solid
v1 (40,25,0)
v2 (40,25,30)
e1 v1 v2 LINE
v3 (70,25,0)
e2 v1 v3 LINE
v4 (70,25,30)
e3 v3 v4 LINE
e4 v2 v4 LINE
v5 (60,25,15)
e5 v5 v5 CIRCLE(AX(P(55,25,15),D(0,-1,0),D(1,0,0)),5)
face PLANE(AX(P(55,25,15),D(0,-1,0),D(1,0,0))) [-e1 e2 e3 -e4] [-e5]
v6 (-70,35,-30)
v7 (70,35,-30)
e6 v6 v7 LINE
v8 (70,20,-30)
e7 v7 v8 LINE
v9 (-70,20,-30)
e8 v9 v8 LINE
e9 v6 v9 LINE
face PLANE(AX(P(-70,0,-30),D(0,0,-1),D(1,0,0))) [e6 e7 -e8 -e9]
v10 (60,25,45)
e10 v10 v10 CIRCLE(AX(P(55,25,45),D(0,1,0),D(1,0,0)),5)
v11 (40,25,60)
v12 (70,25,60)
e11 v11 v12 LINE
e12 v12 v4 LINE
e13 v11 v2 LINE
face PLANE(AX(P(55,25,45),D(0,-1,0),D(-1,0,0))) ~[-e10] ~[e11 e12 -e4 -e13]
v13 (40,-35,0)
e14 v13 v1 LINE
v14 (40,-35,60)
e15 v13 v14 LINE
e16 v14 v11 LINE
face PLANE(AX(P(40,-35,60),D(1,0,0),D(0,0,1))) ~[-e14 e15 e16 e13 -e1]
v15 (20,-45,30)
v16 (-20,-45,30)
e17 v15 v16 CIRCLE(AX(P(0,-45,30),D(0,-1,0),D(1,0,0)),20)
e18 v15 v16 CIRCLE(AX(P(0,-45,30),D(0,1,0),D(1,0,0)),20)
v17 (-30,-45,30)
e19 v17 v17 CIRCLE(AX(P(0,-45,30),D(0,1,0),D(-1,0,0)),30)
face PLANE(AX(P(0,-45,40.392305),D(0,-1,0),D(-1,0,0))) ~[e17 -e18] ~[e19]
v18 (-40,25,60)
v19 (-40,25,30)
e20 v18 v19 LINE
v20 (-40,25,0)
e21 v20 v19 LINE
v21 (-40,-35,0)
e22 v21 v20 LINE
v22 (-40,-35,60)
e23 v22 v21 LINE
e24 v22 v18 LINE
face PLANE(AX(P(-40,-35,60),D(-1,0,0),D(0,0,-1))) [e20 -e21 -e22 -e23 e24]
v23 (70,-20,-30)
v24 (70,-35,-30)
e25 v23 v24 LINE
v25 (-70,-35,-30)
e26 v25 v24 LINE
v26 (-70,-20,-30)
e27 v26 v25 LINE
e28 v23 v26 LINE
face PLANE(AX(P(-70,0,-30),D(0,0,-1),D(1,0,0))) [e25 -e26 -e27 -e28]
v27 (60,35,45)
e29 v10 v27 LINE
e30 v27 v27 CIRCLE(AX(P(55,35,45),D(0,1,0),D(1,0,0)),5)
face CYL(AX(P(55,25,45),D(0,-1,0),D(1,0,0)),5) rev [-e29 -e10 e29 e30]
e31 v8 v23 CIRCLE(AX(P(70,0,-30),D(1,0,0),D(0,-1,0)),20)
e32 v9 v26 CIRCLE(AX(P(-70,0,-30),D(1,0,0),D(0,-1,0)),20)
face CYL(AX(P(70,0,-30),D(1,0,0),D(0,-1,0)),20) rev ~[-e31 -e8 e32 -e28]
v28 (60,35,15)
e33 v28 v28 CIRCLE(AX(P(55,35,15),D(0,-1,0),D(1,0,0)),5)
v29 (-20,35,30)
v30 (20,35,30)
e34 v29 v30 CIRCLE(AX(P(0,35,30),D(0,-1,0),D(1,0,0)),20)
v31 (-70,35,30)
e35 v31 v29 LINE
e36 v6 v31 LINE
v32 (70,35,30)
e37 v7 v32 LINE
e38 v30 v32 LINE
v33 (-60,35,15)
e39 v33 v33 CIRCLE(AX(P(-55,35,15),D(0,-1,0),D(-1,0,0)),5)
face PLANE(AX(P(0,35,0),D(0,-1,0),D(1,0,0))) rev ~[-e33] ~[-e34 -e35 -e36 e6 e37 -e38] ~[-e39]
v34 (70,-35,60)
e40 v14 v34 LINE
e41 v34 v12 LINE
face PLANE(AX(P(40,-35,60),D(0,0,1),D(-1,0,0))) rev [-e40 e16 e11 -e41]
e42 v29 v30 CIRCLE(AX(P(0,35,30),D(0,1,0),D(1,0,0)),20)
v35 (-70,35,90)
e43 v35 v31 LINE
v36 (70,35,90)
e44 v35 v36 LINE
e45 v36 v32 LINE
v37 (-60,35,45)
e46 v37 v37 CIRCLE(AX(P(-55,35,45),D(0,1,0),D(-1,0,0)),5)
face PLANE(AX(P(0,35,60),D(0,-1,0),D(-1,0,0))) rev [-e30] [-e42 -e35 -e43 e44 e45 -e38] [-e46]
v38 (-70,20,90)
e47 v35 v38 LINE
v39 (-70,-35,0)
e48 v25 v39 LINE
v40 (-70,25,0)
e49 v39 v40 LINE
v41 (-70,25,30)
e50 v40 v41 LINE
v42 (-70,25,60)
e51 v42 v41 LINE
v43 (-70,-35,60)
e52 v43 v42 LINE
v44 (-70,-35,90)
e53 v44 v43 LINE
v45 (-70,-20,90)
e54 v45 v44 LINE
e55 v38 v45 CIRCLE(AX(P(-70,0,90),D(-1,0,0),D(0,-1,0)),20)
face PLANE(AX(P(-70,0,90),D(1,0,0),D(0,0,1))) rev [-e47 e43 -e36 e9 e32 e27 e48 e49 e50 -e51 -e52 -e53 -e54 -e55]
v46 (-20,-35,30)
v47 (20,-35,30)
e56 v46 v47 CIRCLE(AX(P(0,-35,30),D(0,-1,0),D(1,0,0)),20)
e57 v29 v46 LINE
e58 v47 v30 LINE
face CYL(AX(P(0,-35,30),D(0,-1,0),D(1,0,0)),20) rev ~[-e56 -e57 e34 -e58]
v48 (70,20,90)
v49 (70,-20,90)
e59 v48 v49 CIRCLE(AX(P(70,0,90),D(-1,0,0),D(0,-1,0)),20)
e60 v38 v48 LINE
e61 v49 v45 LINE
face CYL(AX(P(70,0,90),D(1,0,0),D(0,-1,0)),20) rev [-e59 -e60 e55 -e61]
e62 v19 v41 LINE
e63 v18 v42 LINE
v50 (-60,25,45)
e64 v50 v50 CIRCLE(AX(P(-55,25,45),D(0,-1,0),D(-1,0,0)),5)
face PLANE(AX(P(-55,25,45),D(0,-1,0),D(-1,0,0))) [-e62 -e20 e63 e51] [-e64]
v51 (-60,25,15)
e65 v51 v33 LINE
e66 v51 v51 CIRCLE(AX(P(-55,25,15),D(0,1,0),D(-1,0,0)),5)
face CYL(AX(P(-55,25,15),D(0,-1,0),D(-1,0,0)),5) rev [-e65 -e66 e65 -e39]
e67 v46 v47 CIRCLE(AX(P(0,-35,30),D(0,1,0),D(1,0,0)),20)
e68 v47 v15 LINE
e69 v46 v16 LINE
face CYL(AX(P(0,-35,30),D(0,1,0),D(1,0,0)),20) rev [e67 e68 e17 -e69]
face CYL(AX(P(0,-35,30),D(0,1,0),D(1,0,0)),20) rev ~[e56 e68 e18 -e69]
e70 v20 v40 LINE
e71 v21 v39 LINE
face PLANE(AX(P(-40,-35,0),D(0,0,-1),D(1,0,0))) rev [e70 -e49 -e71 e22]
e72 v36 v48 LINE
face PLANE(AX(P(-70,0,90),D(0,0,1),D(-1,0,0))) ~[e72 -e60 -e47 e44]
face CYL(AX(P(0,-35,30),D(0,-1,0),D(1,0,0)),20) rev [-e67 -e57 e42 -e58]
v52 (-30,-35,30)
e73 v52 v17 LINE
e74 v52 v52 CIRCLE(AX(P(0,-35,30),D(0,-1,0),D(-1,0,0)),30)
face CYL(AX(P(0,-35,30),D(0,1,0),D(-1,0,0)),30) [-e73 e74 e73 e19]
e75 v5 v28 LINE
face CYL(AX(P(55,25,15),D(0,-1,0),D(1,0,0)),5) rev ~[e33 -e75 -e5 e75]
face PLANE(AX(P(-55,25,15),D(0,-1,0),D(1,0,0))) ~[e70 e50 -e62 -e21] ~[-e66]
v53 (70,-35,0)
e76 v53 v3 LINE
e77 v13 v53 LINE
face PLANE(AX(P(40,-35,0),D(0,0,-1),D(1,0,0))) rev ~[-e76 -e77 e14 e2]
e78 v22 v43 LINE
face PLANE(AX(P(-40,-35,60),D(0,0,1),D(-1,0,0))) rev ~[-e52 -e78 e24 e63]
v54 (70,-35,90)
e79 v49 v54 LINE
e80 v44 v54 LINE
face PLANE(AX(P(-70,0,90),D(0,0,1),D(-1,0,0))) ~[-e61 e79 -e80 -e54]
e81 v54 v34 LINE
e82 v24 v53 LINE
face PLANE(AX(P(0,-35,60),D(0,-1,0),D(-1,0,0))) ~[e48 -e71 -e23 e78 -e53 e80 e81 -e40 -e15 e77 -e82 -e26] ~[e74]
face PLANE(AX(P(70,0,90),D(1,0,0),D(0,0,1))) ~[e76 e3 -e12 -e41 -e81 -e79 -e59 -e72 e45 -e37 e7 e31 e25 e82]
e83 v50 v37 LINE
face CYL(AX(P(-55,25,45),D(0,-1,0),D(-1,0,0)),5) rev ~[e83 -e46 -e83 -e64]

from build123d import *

# Parameters (mm, degrees)
F0_W      = 140
F0_H      = 60
F1_DEPTH  = 35
F3_DEPTH  = 140.001
F4_W      = 30
F4_H      = 30
F5_DEPTH  = 60
F6_R      = 20
F7_DEPTH  = 72.1
F9_DEPTH  = 10
F11_DEPTH = 25
F12_R     = 5
F13_DEPTH = 25


# Not quite as in the source:
# - a pattern or mirror of a feature is missing from the dataset's text; its kind, count and spacing are read off the source's solid


with BuildPart() as f1:
    # F0 (on Front) → F1 (new body, symmetric)
    with BuildSketch(Plane.XZ):
        Rectangle(F0_W, F0_H)
    extrude(amount=F1_DEPTH, both=True)

    # F2 (on face) → F3 (cut, through all)
    with BuildSketch(Plane.YZ.offset(70)):
        with BuildLine():
            Line((-20, -30), (20, -30))
            ThreePointArc((20, -30), (0, -10), (-20, -30))
        make_face()
        with BuildLine():
            ThreePointArc((-20, -30), (0, -50), (20, -30))
            Line((20, -30), (-20, -30))
        make_face()
    extrude(amount=-F3_DEPTH, mode=Mode.SUBTRACT)

    # F4 (on face) → F5 (cut)
    with BuildSketch(Plane.XZ.offset(35)):
        with Locations((55, 15)):
            Rectangle(F4_W, F4_H)
    f5 = extrude(amount=-F5_DEPTH, mode=Mode.SUBTRACT)

    # F5_copies: F5 across plane
    add(f5.mirror(Plane(origin=(0, 0, 0), x_dir=(0, 0, -1), z_dir=(-1, 0, 0))), mode=Mode.SUBTRACT)

    # F6 (on face) → F7 (cut)
    with BuildSketch(Plane.XZ.offset(35)):
        with Locations((0, 30)):
            Circle(F6_R)
    extrude(amount=-F7_DEPTH, mode=Mode.SUBTRACT)

    # F8 (on face) → F9 (join)
    with BuildSketch(Plane.XZ.offset(35)):
        with BuildLine():
            Line((0, 30), (-30, 30))
            ThreePointArc((-30, 30), (0, 0), (30, 30))
            Line((30, 30), (0, 30))
        make_face()
    extrude(amount=F9_DEPTH)

    # F10 (on face) → F11 (cut)
    with BuildSketch(Plane(origin=(0, -35, 0), x_dir=(-1, 0, 0), z_dir=(0, 1, 0))):
        with BuildLine():
            ThreePointArc((-20, 30), (0, 10), (20, 30))
            Line((20, 30), (-20, 30))
        make_face()
    extrude(amount=-F11_DEPTH, mode=Mode.SUBTRACT)

    # F12 (on face) → F13 (cut)
    with BuildSketch(Plane.XZ.offset(-25)):
        with Locations((55, 15)):
            Circle(F12_R)
    f13 = extrude(amount=-F13_DEPTH, mode=Mode.SUBTRACT)

    # F13_copies: F13 across plane
    add(f13.mirror(Plane(origin=(0, 0, 0), x_dir=(0, 0, -1), z_dir=(-1, 0, 0))), mode=Mode.SUBTRACT)

    # F15: F1 across plane


with BuildPart() as f1_1:
    add(f1.part)
    add(f1.part.mirror(Plane.XY.offset(30)))


solid = f1_1.part
